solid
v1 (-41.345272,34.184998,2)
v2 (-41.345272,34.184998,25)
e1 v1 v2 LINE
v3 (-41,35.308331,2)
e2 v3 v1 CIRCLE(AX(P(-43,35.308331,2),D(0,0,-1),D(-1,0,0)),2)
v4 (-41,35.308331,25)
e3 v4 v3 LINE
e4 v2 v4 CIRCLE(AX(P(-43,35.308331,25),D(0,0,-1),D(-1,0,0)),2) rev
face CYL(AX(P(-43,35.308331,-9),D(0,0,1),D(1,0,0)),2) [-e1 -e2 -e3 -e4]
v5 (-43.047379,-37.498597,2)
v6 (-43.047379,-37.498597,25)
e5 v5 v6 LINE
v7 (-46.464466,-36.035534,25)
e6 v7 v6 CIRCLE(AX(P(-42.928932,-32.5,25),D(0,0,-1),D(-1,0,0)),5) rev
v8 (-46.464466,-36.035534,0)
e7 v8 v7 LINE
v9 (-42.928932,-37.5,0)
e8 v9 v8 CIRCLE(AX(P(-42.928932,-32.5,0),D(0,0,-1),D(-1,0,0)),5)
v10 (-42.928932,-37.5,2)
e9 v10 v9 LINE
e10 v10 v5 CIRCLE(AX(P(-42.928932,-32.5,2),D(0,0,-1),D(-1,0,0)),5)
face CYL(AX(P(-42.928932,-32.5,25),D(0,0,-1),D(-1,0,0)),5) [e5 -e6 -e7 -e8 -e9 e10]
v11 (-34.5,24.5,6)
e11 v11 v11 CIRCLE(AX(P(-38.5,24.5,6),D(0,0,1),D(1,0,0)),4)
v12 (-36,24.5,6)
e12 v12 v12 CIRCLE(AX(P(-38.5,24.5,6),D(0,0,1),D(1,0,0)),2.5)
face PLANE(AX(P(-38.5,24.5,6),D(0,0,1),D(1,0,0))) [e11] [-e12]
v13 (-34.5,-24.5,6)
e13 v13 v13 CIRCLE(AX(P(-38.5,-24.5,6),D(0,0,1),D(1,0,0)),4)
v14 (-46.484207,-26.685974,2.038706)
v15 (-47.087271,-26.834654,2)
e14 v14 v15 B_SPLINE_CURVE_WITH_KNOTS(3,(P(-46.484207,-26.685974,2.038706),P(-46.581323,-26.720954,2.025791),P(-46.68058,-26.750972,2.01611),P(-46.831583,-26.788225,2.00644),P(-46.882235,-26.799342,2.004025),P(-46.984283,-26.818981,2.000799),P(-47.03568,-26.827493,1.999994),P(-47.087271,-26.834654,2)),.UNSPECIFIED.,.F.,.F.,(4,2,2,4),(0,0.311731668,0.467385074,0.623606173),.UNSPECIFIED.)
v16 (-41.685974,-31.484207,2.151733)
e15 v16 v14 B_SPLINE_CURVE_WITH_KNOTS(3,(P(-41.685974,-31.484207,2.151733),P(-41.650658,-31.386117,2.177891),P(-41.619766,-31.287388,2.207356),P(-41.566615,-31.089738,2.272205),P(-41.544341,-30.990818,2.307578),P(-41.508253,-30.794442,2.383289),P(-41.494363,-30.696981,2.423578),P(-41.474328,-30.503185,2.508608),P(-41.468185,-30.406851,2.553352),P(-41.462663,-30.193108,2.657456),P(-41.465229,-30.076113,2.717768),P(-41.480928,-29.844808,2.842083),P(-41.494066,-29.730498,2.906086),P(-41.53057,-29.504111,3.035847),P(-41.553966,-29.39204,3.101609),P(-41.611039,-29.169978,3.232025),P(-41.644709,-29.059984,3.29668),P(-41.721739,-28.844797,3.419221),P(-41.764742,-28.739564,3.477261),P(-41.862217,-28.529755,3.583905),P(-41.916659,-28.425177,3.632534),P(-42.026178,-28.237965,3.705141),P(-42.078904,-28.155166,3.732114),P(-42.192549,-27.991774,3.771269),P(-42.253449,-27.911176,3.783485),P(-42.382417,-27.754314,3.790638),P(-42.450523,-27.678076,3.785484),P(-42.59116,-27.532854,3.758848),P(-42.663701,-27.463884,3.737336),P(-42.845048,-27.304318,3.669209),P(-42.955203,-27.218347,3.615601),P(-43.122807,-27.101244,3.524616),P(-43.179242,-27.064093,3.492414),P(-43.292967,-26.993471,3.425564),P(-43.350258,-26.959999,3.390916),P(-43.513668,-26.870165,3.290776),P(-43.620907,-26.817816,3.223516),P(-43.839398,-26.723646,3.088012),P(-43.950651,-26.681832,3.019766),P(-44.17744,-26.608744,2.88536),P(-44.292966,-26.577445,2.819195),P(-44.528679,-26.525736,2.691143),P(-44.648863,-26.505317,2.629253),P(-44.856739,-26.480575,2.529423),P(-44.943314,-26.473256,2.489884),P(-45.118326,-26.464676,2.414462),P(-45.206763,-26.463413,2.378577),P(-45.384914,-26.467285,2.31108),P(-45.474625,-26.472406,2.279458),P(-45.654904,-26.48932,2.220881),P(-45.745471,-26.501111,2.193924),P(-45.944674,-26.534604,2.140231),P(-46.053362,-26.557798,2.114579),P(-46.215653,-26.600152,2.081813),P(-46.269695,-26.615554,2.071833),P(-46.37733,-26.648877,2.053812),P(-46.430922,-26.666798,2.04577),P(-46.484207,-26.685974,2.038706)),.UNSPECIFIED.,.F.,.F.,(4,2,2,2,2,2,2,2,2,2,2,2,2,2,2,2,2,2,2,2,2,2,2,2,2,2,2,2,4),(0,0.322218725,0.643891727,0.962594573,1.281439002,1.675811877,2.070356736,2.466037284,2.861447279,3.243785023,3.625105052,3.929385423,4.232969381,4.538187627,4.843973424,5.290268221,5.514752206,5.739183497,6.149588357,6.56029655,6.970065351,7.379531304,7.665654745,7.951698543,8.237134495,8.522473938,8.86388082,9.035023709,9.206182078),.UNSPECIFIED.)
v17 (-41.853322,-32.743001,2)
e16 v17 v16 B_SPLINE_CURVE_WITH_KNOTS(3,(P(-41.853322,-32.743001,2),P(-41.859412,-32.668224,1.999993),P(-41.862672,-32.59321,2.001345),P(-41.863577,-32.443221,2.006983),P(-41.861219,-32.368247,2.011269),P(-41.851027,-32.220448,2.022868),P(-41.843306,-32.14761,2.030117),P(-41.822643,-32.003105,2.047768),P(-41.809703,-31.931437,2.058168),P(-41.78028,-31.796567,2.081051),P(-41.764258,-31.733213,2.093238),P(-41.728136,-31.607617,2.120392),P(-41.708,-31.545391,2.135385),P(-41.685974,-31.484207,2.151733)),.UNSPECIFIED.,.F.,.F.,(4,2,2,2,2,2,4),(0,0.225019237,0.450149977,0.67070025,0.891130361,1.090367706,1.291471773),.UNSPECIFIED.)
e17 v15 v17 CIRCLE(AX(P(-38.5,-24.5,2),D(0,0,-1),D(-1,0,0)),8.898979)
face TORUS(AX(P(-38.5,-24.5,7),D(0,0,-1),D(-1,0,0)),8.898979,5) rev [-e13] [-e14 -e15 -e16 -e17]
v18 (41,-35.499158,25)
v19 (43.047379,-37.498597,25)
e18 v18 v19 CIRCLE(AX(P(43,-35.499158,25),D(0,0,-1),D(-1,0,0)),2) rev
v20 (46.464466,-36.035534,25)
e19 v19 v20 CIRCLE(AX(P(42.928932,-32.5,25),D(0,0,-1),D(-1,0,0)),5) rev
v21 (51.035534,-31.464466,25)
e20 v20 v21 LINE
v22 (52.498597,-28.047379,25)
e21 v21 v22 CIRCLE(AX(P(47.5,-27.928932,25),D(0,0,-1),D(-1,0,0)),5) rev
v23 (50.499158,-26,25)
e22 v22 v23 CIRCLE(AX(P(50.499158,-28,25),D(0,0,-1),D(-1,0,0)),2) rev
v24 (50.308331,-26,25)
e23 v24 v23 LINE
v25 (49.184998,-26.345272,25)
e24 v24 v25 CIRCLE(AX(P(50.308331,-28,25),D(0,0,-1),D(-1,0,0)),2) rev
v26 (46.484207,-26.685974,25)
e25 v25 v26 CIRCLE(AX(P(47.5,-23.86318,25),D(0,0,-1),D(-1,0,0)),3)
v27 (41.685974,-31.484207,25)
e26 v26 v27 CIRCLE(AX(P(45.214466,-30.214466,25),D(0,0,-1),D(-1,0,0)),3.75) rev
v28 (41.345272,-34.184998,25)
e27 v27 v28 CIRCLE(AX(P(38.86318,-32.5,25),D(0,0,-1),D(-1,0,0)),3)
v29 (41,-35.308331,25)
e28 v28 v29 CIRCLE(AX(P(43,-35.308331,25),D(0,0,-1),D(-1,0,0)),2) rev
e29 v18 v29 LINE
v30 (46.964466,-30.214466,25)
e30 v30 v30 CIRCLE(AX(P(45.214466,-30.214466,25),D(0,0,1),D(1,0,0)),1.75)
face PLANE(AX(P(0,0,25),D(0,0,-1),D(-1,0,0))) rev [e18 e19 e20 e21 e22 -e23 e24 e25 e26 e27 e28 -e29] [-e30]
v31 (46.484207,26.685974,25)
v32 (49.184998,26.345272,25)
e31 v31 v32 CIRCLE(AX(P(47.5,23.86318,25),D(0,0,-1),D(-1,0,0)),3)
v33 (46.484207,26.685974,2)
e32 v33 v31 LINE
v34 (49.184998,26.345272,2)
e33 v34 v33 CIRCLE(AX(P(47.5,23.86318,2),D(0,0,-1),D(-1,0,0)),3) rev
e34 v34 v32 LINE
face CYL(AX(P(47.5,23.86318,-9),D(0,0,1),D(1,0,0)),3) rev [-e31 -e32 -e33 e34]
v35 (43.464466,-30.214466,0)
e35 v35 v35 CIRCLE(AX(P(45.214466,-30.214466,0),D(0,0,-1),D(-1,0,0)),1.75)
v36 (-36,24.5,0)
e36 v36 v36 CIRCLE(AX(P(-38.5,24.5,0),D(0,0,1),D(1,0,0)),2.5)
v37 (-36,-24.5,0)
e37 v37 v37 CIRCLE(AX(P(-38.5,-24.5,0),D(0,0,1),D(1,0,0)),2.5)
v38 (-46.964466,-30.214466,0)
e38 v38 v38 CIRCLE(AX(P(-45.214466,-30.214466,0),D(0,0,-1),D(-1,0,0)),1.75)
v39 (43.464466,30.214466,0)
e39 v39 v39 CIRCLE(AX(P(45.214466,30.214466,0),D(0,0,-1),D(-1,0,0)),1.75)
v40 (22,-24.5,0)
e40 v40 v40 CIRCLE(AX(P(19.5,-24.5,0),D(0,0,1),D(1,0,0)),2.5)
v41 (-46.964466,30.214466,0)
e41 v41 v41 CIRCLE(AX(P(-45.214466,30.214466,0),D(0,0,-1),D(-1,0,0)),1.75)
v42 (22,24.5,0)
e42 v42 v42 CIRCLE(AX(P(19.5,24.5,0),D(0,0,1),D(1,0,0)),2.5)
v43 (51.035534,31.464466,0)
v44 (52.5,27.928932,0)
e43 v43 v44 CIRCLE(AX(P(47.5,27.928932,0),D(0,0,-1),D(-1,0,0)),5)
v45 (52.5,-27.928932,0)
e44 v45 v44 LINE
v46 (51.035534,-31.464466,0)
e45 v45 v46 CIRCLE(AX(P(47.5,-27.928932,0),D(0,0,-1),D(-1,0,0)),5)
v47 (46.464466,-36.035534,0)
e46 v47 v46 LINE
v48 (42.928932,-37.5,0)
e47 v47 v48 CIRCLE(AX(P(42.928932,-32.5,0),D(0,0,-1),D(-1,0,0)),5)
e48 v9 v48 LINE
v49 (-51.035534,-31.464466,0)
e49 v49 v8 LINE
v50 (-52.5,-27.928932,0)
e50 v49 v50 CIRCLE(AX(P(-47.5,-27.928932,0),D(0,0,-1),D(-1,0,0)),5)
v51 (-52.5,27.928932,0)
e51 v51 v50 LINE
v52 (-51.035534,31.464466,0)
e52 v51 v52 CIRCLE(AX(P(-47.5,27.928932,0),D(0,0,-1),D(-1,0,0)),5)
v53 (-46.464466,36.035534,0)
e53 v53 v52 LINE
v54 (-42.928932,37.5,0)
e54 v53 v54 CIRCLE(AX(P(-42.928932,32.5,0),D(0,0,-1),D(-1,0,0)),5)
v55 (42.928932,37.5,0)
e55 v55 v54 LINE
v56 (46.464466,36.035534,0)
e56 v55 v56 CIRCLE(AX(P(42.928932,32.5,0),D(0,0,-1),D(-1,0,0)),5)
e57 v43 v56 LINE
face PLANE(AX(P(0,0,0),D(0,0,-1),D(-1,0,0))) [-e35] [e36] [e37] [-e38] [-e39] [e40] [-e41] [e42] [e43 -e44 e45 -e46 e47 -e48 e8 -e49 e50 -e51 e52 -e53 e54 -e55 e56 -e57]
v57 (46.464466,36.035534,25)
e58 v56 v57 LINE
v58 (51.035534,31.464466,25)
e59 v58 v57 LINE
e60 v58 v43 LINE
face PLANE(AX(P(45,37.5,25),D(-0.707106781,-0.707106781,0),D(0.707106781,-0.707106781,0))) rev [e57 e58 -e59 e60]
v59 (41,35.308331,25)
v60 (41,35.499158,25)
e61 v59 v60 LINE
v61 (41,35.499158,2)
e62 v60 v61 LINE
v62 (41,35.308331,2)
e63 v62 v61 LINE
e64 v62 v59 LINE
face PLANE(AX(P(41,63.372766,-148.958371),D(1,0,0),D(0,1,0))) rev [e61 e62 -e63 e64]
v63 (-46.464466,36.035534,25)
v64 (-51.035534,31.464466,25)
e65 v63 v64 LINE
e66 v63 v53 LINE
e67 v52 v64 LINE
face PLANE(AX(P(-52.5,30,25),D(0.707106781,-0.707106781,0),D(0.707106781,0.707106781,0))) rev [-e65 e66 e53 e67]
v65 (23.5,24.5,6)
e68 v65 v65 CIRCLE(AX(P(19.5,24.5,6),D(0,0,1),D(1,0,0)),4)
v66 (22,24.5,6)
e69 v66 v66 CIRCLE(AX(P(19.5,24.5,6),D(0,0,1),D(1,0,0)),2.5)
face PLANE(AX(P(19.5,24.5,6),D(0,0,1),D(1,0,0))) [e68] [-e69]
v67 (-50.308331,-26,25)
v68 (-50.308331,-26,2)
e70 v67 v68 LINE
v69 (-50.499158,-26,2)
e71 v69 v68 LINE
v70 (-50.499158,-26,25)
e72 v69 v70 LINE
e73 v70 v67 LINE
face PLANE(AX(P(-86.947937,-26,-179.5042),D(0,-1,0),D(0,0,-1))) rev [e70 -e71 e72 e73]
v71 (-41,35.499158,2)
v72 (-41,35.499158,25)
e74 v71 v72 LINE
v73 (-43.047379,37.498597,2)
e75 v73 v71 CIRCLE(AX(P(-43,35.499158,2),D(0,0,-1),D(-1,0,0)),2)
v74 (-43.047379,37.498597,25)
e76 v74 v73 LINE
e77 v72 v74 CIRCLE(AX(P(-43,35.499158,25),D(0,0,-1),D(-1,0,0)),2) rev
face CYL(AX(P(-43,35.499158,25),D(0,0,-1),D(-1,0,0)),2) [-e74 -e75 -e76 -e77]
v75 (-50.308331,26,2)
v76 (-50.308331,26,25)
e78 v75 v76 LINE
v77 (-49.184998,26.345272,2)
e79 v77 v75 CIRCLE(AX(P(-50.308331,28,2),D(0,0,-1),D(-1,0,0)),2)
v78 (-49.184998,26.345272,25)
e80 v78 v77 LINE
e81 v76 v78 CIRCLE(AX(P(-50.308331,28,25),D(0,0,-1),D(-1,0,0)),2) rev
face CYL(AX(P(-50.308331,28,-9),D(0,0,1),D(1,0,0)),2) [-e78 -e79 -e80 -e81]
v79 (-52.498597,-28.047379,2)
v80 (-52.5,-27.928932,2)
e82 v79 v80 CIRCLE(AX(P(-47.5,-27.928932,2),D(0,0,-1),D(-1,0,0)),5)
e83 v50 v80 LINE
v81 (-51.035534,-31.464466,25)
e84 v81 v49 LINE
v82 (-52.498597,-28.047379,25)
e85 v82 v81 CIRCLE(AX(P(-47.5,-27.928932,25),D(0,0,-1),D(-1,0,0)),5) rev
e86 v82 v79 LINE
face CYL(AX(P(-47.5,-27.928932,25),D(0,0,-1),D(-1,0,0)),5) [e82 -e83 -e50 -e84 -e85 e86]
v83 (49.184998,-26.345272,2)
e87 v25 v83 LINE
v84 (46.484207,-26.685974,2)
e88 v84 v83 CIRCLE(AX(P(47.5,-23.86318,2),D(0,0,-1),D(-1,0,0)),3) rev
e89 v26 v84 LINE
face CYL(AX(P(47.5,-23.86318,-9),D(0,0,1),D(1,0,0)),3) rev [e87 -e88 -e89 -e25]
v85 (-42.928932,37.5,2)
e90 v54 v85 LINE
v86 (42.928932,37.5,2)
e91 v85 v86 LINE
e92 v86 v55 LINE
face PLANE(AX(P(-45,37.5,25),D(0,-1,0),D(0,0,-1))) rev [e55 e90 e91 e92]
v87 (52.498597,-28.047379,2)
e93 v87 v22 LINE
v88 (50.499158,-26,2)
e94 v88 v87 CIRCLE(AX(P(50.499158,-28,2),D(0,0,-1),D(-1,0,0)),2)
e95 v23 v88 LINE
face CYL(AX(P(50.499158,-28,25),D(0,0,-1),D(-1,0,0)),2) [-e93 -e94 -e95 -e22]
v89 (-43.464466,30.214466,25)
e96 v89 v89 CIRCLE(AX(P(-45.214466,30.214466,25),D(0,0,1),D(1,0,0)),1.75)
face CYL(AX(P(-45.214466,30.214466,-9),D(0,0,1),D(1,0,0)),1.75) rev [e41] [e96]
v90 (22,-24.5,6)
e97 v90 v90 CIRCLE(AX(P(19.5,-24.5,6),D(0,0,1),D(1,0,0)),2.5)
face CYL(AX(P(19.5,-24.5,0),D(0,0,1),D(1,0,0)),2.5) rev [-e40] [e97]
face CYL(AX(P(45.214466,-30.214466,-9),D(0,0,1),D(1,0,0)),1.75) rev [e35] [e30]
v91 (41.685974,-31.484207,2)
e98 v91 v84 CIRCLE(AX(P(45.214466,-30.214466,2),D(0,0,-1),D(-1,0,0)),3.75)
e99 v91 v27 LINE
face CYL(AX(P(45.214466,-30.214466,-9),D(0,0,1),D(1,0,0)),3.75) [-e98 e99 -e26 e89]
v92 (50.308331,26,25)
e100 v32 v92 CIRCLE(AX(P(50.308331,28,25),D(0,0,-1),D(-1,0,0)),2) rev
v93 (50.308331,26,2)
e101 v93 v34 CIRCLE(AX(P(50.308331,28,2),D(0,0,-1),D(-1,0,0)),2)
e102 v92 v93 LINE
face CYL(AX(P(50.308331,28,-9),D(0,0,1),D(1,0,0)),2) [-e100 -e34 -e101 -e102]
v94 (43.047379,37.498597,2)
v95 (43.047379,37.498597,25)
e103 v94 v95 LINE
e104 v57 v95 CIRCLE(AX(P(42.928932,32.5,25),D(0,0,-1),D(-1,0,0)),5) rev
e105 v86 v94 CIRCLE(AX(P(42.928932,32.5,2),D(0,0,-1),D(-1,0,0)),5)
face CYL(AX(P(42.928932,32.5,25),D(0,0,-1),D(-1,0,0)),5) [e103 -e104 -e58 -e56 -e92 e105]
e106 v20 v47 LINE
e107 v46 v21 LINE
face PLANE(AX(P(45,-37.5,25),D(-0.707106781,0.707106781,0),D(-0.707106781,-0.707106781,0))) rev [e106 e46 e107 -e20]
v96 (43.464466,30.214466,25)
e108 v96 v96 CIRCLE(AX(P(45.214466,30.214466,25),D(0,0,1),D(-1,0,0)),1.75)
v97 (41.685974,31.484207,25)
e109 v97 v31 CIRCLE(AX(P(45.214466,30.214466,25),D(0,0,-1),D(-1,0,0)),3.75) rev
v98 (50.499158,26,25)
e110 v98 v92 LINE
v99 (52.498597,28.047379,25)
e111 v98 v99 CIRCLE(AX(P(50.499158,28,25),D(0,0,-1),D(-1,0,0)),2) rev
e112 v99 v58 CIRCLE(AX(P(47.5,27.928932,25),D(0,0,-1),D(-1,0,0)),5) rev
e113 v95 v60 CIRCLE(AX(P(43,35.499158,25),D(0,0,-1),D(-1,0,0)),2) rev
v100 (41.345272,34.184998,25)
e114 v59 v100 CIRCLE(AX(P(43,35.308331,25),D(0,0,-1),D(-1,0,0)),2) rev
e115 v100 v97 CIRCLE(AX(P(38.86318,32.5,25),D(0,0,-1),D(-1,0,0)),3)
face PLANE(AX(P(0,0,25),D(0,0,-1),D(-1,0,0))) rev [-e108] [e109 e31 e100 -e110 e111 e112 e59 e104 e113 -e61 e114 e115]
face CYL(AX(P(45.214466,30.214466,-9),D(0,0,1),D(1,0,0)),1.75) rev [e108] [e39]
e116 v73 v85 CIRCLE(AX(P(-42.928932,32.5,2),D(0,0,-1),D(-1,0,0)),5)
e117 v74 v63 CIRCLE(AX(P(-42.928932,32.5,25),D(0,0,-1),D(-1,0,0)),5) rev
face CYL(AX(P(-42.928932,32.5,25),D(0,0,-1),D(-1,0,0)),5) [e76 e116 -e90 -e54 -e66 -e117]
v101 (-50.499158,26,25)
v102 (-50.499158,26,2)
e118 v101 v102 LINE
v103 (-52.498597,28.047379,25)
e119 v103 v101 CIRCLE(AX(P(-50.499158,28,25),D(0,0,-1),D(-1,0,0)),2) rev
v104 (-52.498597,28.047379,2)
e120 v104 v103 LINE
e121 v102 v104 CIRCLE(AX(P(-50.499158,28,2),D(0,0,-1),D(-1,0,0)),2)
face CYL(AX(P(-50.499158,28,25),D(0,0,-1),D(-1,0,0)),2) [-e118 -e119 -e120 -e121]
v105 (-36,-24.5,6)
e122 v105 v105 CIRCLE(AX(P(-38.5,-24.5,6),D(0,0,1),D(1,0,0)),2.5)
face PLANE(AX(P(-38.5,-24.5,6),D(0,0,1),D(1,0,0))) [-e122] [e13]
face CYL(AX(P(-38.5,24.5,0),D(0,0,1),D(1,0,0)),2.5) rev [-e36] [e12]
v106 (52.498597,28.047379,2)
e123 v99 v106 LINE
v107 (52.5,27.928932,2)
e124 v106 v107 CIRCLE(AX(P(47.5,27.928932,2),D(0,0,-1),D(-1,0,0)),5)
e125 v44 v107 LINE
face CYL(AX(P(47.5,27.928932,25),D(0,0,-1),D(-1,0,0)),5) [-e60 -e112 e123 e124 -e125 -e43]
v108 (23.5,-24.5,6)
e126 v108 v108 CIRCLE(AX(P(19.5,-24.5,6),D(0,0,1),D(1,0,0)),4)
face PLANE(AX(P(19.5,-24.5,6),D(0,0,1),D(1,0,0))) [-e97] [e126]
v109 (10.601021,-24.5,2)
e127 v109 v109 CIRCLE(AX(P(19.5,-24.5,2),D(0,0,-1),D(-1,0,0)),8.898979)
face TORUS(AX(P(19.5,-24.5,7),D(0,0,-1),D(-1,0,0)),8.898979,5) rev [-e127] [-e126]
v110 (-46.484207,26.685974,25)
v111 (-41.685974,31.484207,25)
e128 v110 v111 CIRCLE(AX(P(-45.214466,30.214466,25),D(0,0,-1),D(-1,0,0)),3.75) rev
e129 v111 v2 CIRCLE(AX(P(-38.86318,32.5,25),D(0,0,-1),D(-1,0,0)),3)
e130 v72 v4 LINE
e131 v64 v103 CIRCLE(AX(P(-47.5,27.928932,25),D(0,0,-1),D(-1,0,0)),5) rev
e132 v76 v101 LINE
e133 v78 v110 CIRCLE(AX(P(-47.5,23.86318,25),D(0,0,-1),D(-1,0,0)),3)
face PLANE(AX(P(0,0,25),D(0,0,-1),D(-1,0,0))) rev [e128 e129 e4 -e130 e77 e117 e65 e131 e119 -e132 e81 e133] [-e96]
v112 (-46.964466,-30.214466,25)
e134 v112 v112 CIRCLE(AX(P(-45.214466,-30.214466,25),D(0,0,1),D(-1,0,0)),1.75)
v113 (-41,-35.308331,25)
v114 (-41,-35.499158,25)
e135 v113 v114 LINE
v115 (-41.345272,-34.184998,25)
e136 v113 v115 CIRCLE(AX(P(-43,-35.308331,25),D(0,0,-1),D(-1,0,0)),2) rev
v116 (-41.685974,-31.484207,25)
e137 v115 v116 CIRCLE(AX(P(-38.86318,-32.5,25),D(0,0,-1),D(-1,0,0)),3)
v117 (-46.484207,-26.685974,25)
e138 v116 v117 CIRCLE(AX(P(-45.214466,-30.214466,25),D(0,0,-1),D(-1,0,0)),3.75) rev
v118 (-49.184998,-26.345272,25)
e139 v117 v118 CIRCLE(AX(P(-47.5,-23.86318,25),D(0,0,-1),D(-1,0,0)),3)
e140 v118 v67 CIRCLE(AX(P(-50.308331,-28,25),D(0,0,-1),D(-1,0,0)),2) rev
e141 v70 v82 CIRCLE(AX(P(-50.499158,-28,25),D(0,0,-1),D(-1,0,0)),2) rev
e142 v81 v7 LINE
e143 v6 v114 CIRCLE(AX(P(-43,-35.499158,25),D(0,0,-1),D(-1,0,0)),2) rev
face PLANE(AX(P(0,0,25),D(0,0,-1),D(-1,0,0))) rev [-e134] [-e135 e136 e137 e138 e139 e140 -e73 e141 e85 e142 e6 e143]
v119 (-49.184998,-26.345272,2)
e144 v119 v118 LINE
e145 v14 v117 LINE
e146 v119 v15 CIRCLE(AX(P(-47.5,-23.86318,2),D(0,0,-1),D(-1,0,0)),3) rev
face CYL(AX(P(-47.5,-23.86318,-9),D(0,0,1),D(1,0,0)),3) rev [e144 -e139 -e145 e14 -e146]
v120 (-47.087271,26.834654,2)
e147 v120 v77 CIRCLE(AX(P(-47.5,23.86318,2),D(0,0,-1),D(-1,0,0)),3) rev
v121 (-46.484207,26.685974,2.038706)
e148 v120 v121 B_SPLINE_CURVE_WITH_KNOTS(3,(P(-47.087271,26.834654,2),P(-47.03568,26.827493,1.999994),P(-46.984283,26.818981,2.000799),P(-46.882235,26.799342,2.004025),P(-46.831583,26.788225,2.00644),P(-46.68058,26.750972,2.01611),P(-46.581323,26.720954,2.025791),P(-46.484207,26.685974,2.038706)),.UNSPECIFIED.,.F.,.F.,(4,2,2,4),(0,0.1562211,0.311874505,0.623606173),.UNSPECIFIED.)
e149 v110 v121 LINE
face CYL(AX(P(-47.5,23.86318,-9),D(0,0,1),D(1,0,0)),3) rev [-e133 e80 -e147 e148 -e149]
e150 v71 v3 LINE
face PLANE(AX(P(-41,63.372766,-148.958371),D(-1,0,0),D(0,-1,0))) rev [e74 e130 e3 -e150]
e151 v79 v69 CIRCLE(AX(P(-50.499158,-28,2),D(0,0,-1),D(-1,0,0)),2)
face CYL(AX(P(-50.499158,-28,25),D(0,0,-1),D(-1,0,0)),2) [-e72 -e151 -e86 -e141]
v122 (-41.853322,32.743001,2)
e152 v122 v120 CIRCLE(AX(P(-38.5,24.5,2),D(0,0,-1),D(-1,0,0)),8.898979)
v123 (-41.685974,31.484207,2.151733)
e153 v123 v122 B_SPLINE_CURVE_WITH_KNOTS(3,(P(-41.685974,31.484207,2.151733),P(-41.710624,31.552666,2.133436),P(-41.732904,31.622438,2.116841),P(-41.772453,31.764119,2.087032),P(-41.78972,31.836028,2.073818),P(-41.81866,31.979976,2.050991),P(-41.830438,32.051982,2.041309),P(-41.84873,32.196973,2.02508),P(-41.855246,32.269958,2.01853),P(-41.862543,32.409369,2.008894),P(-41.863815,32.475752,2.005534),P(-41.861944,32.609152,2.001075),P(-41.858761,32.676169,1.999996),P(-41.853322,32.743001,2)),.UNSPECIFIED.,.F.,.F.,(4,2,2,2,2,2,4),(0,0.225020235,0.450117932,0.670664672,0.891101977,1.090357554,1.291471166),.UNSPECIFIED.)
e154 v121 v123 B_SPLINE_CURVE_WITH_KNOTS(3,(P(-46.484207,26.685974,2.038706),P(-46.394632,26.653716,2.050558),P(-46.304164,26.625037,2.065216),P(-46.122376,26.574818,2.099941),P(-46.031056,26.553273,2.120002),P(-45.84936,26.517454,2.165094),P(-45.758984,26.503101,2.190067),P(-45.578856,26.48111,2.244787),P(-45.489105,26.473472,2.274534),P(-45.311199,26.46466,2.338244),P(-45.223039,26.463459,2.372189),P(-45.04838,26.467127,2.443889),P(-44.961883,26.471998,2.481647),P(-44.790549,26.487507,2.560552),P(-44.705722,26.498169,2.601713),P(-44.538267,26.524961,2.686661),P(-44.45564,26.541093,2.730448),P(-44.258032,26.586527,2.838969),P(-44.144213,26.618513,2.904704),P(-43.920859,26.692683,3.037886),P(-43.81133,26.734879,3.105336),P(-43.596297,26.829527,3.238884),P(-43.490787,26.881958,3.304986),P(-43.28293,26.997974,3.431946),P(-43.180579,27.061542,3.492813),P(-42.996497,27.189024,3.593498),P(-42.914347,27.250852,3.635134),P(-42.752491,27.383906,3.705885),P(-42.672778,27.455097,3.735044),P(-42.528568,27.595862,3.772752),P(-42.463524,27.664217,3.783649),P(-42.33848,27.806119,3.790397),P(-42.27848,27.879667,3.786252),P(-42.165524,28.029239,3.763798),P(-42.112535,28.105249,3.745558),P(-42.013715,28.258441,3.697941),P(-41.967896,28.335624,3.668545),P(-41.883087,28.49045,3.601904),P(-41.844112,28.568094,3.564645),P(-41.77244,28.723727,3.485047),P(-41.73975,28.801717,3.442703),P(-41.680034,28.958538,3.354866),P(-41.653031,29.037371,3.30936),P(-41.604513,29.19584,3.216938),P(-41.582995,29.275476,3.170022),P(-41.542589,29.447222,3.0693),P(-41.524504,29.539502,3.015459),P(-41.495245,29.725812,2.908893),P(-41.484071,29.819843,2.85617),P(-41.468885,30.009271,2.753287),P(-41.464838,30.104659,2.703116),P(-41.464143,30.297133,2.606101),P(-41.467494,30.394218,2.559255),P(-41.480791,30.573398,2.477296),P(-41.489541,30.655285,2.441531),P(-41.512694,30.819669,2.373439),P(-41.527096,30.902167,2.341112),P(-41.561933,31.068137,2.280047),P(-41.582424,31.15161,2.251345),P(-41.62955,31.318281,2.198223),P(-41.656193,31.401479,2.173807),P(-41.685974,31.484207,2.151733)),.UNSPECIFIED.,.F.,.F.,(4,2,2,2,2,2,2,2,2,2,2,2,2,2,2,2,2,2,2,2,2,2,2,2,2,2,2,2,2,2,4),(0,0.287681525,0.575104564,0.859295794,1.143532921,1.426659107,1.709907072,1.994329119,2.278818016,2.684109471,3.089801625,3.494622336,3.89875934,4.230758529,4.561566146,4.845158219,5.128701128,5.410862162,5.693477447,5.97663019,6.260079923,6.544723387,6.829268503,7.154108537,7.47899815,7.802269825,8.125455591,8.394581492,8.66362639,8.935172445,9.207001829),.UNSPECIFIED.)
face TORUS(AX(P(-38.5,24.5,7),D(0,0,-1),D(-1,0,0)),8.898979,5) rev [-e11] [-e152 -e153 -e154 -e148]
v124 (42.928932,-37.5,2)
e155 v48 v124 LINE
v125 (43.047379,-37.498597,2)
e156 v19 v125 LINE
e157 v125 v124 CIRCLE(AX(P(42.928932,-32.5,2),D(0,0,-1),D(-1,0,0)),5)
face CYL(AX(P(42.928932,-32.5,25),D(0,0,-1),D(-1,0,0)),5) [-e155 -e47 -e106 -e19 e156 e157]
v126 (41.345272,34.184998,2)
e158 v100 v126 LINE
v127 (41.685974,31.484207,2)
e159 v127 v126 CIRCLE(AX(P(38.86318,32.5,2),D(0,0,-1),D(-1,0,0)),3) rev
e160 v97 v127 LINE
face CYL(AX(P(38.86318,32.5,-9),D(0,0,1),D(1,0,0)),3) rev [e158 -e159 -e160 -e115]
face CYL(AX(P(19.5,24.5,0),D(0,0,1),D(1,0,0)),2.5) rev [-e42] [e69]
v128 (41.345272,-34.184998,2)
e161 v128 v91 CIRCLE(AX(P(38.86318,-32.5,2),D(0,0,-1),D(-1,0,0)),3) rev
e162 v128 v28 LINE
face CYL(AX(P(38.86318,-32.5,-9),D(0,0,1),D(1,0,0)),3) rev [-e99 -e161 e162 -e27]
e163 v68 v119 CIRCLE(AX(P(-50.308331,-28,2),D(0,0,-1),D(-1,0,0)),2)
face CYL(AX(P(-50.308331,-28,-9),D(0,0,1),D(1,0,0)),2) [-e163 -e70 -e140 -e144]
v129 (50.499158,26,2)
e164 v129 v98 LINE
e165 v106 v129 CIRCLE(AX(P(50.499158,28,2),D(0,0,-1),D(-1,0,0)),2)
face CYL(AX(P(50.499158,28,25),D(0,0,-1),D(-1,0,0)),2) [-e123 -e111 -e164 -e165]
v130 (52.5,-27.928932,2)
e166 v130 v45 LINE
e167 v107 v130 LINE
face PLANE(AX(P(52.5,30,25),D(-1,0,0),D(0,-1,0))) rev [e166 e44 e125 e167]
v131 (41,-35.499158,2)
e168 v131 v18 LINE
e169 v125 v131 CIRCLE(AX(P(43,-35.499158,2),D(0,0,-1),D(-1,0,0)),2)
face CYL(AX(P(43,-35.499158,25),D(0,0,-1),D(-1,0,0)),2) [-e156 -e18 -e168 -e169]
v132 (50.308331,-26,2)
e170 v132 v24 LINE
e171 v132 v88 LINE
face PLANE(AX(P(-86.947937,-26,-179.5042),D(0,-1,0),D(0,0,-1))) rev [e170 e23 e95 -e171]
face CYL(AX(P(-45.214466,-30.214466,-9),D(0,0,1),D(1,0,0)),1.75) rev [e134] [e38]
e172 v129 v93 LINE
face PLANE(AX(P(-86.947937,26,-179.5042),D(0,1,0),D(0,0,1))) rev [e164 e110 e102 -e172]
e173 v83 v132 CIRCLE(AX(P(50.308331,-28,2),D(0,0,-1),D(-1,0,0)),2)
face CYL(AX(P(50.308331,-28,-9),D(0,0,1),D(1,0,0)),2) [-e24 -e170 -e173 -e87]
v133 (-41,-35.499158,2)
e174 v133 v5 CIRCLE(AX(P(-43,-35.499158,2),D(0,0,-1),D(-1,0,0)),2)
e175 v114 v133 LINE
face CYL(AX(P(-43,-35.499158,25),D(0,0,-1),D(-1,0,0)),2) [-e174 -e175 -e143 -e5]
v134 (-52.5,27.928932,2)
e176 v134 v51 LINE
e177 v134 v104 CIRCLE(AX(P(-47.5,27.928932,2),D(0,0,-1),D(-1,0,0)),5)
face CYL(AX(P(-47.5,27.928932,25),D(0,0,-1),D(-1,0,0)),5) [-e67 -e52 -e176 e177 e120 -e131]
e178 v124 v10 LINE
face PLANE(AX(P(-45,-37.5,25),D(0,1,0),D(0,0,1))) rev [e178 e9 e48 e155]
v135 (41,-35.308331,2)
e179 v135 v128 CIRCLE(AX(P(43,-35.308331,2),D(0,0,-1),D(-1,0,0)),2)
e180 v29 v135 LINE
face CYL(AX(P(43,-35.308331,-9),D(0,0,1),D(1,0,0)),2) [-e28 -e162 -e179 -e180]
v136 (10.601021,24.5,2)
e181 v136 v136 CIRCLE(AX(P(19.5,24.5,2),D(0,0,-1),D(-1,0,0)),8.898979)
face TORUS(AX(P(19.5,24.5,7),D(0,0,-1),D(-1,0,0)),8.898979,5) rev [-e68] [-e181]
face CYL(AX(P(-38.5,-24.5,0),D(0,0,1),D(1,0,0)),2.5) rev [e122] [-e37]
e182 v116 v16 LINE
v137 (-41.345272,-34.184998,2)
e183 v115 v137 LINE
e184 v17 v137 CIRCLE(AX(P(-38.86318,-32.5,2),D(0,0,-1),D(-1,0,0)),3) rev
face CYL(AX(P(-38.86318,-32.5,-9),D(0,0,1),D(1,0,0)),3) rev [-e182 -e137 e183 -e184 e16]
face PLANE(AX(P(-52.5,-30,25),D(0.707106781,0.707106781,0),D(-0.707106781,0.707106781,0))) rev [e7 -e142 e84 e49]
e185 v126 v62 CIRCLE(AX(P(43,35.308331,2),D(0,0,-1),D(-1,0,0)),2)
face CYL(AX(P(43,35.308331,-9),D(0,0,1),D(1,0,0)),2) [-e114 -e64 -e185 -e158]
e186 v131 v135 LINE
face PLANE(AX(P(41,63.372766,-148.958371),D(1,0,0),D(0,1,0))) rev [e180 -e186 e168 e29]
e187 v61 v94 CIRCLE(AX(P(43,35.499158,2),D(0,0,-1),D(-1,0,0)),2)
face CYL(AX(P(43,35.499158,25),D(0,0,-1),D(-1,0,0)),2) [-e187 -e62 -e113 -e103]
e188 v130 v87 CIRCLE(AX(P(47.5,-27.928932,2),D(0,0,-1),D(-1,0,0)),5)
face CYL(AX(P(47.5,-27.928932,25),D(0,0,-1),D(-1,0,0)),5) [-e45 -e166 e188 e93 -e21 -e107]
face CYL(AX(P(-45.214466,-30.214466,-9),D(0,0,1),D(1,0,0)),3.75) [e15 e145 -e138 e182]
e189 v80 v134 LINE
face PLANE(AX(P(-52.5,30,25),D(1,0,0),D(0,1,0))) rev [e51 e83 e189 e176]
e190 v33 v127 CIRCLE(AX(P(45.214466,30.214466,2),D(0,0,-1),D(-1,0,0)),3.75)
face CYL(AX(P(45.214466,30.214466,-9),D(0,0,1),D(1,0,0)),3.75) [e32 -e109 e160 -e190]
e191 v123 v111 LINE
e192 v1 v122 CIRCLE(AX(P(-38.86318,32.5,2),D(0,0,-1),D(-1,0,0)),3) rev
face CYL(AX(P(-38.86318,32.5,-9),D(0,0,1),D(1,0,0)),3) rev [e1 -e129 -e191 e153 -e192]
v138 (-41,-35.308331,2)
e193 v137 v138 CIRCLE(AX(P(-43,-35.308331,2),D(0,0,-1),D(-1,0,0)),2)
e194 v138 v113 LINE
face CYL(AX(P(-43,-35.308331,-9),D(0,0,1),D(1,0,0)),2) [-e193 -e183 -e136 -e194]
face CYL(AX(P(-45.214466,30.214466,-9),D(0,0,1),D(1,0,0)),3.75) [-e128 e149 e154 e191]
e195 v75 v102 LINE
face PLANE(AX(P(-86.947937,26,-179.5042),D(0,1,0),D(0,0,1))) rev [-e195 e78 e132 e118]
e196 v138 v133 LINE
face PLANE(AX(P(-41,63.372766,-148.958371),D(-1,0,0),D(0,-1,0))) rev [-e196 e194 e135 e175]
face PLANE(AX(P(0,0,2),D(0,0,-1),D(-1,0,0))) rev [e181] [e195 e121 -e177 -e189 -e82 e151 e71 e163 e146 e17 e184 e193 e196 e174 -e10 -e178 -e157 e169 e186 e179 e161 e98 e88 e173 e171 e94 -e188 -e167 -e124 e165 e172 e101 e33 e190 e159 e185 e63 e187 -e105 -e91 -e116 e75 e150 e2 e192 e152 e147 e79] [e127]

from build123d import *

# Parameters (mm, degrees)
EXTRUDE_1_DEPTH     = 25
SKETCH_2_R          = 1.75
CUT_EXTRUDE_1_DEPTH = 34
SHELL_1_T           = -2
FILLET_1_R          = 10
FILLET_2_R          = 3
FILLET_3_R          = 5
SKETCH_4_W          = 82
SKETCH_4_H          = 126.745531776
CUT_EXTRUDE_2_DEPTH = 23
FILLET_4_R          = 2
SKETCH_5_W          = 173.89587329
SKETCH_5_H          = 52
CUT_EXTRUDE_3_DEPTH = 23
FILLET_5_R          = 2
SKETCH_6_R          = 4
EXTRUDE_2_DEPTH     = 4
SKETCH_7_R          = 2.5
CUT_EXTRUDE_4_DEPTH = 6
FILLET_6_R          = 5


with BuildPart() as part:
    # Эскиз1 → Бобышка-Вытянуть1 (new body)
    with BuildSketch(Plane.XY):
        Polygon((-52.5, 30), (-45, 37.5), (45, 37.5), (52.5, 30), (52.5, -30), (45, -37.5), (-45, -37.5), (-52.5, -30), align=None)
    extrude(amount=EXTRUDE_1_DEPTH)

    # Эскиз2 → Вырез-Вытянуть1 (cut)
    with BuildSketch(Plane.XY.offset(25)):
        with Locations((-45.214466094, 30.214466094)):
            Circle(SKETCH_2_R)
        with Locations(Location((45.214466094, 30.214466094, 0), (0, 0, 180))):
            Circle(SKETCH_2_R)
        with Locations((45.214466094, -30.214466094)):
            Circle(SKETCH_2_R)
        with Locations(Location((-45.214466094, -30.214466094, 0), (0, 0, 180))):
            Circle(SKETCH_2_R)
    extrude(amount=-CUT_EXTRUDE_1_DEPTH, mode=Mode.SUBTRACT)

    # Оболочка1
    shell_1_openings = [part.faces().sort_by_distance(p)[0] for p in [
        (0, 0, 25),
    ]]
    offset(amount=SHELL_1_T, openings=shell_1_openings, kind=Kind.INTERSECTION)

    # Скругление1
    # the kernel refuses this fillet: 10 mm, written as the material it adds along each edge
    with BuildSketch(Plane(origin=(-45.74479618, -33.926776695, 2), x_dir=(0.7071067811865442, -0.7071067811865507, 0), z_dir=(0, 0, 1)), Plane(origin=(48.926776695, -30.74479618, 2), x_dir=(0.7071067811865482, 0.7071067811865467, 0), z_dir=(0, 0, 1)), Plane(origin=(45.74479618, 33.926776695, 2), x_dir=(-0.707106781186546, 0.7071067811865492, 0), z_dir=(0, 0, 1)), Plane(origin=(-48.926776695, 30.74479618, 2), x_dir=(-0.7071067811865508, -0.7071067811865444, 0), z_dir=(0, 0, 1))) as fillet_1_piece_1:
        with BuildLine():
            CenterArc((11.477032042, 3.794412555), FILLET_1_R, 183.312134334, 18.986942704)
            Line((1.493736012, 3.21665797), (1.294070091, 3.205102878))
            ThreePointArc((1.294070091, 3.205102878), (0.969771845, 1.504817982), (-0.12, 0.16))
            Line((-0.12, 0.16), (0, -0.2))
            ThreePointArc((0, -0.2), (1.112436867, -0.2), (2.039830568, -0.075888251))
            Line((2.039830568, -0.075888251), (2.224873734, 0))
        make_face()
    extrude(amount=23)
    with BuildSketch(Plane(origin=(-48.926776695, -30.74479618, 2), x_dir=(0.34351243985929386, 0.9391481265816991, 0), z_dir=(0, 0, 1)), Plane(origin=(45.74479618, -33.926776695, 2), x_dir=(-0.9391481265817004, 0.34351243985929, 0), z_dir=(0, 0, 1)), Plane(origin=(48.926776695, 30.74479618, 2), x_dir=(-0.3435124398592874, -0.9391481265817014, 0), z_dir=(0, 0, 1)), Plane(origin=(-45.74479618, 33.926776695, 2), x_dir=(0.9391481265817011, -0.34351243985928803, 0), z_dir=(0, 0, 1))) as fillet_1_piece_2:
        with BuildLine():
            CenterArc((8.275322434, 8.811292173), FILLET_1_R, 222.791938952, 18.986942704)
            Line((0.937067943, 2.017911495), (0.790302854, 1.882043882))
            ThreePointArc((0.790302854, 1.882043882), (0.287138375, 1.093191354), (-0.181395597, 0.084235607))
            Line((-0.181395597, 0.084235607), (0.094575114, -0.176225843))
            ThreePointArc((0.094575114, -0.176225843), (1.773283379, 0.245765435), (3.451991644, -0.176225843))
            Line((3.451991644, -0.176225843), (3.546566758, 0))
        make_face()
    extrude(amount=23)

    # Скругление2
    fillet_2_edges = [part.edges().sort_by_distance(p)[0] for p in [
        (-50.5, 29.171572875, 13.5),
        (-44.171572875, 35.5, 13.5),
        (-44.171572875, -35.5, 13.5),
        (-50.5, -29.171572875, 13.5),
        (44.171572875, -35.5, 13.5),
        (50.5, -29.171572875, 13.5),
        (50.5, 29.171572875, 13.5),
        (44.171572875, 35.5, 13.5),
    ]]
    fillet(fillet_2_edges, radius=FILLET_2_R)

    # Скругление3
    fillet_3_edges = [part.edges().sort_by_distance(p)[0] for p in [
        (45, 37.5, 12.5),
        (52.5, 30, 12.5),
        (52.5, -30, 12.5),
        (45, -37.5, 12.5),
        (-45, -37.5, 12.5),
        (-52.5, -30, 12.5),
        (-52.5, 30, 12.5),
        (-45, 37.5, 12.5),
    ]]
    fillet(fillet_3_edges, radius=FILLET_3_R)

    # Эскиз4 → Вырез-Вытянуть2 (cut)
    with BuildSketch(Plane.XY.offset(25)):
        Rectangle(SKETCH_4_W, SKETCH_4_H)
    extrude(amount=-CUT_EXTRUDE_2_DEPTH, mode=Mode.SUBTRACT)

    # Скругление4
    # the kernel refuses this fillet: 2 mm, written as the material it takes off along each edge
    with BuildSketch(Plane(origin=(41, -34.605706623, 2), x_dir=(0, -1, 0), z_dir=(0, 0, 1)), Plane(origin=(41, 34.605706623, 26.756559814), x_dir=(0, 1, 0), z_dir=(0, 0, -1))) as fillet_4_piece_1:
        with BuildLine():
            CenterArc((0.702623926, 2), FILLET_4_R, 235.828901177, 34.171098823)
            ThreePointArc((-0.420708294, 0.345272009), (-0.20250821, 0.18219615), (0, 0))
            Line((0, 0), (0.702623926, 0))
        make_face()
    extrude(amount=24.756559814, mode=Mode.SUBTRACT)
    with BuildSketch(Plane(origin=(41, -37.5, 30.118447555), x_dir=(0.9999997651545144, 0.0006853400003404547, 0), z_dir=(0, 0, -1)), Plane(origin=(-41, -37.5, 2), x_dir=(-0.9999997651545144, 0.0006853400003439418, 0), z_dir=(0, 0, 1)), Plane(origin=(41, 37.5, 2), x_dir=(0.9999997651545144, -0.0006853400003439394, 0), z_dir=(0, 0, 1))) as fillet_4_piece_2:
        with BuildLine():
            CenterArc((2.001370787, -1.999470741), FILLET_4_R, 88.681844886, 91.357422207)
            Line((0.001371257, -2.000841421), (-0.198628696, -2.000978489))
            Line((-0.198628696, -2.000978489), (-0.199999953, -0.000137068))
            Line((-0.199999953, -0.000137068), (-0.000137068, 0.199999953))
            ThreePointArc((-0.000137068, 0.199999953), (1.928794667, 0.201321927), (2.051979846, 0.199947074))
            Line((2.051979846, 0.199947074), (2.047379022, 0))
        make_face()
    extrude(amount=28.118447555, mode=Mode.SUBTRACT)
    with BuildSketch(Plane(origin=(-41, -34.605706623, 2), x_dir=(0, -1, 0), z_dir=(0, 0, 1))) as fillet_4_piece_3:
        with BuildLine():
            CenterArc((0.702623926, -2), FILLET_4_R, 90, 34.171098823)
            ThreePointArc((-0.420708294, -0.345272009), (-0.20250821, -0.18219615), (0, 0))
            Line((0, 0), (0.702623926, 0))
        make_face()
    extrude(amount=24.756559814, mode=Mode.SUBTRACT)
    with BuildSketch(Plane(origin=(-41, 34.605706623, 26.756559814), x_dir=(-0.6343994710235763, -0.7730053758965758, 0), z_dir=(0, 0, -1))) as fillet_4_piece_4:
        with BuildLine():
            CenterArc((0.72566687, 1.991754999), FILLET_4_R, 230.624541426, 34.171098823)
            Line((-0.543132072, 0.445744247), (0, 0))
            ThreePointArc((0, 0), (0.272125076, 0.012367502), (0.544250153, 0))
        make_face()
    extrude(amount=24.756559814, mode=Mode.SUBTRACT)
    with BuildSketch(Plane(origin=(-41, 37.5, 30.118447555), x_dir=(0, -1, 0), z_dir=(0, 0, -1))) as fillet_4_piece_5:
        with BuildLine():
            CenterArc((2.00084189, 2), FILLET_4_R, 178.642577793, 91.357422207)
            Line((0.001403151, 2.047378541), (-0.198540723, 2.052116395))
            ThreePointArc((-0.198540723, 2.052116395), (-0.2, 1.928932188), (-0.2, 0))
            Line((-0.2, 0), (0, -0.2))
            Line((0, -0.2), (2.00084189, -0.2))
            Line((2.00084189, -0.2), (2.00084189, 0))
        make_face()
    extrude(amount=28.118447555, mode=Mode.SUBTRACT)

    # Эскиз5 → Вырез-Вытянуть3 (cut)
    with BuildSketch(Plane.XY.offset(25)):
        Rectangle(SKETCH_5_W, SKETCH_5_H)
    extrude(amount=-CUT_EXTRUDE_3_DEPTH, mode=Mode.SUBTRACT)

    # Скругление5
    # the kernel refuses this fillet: 2 mm, written as the material it takes off along each edge
    with BuildSketch(Plane(origin=(49.605706623, -26, 26.756559814), x_dir=(1, 0, 0), z_dir=(0, 0, -1)), Plane(origin=(-49.605706623, -26, 2), x_dir=(-1, 0, 0), z_dir=(0, 0, 1))) as fillet_5_piece_1:
        with BuildLine():
            CenterArc((0.702623926, 2), FILLET_5_R, 235.828901177, 34.171098823)
            ThreePointArc((-0.420708294, 0.345272009), (-0.20250821, 0.18219615), (0, 0))
            Line((0, 0), (0.702623926, 0))
        make_face()
    extrude(amount=24.756559814, mode=Mode.SUBTRACT)
    with BuildSketch(Plane(origin=(52.5, -26, 2), x_dir=(-0.0006853400003439216, -0.9999997651545144, 0), z_dir=(0, 0, 1)), Plane(origin=(52.5, 26, 30.118447555), x_dir=(-0.0006853400003439287, 0.9999997651545144, 0), z_dir=(0, 0, -1)), Plane(origin=(-52.5, -26, 30.118447555), x_dir=(0.0006853400003404618, -0.9999997651545144, 0), z_dir=(0, 0, -1)), Plane(origin=(-52.5, 26, 2), x_dir=(0.0006853400003404558, 0.9999997651545144, 0), z_dir=(0, 0, 1))) as fillet_5_piece_2:
        with BuildLine():
            CenterArc((2.001370787, -1.999470741), FILLET_5_R, 88.681844886, 91.357422207)
            Line((0.001371257, -2.000841421), (-0.198628696, -2.000978489))
            Line((-0.198628696, -2.000978489), (-0.199999953, -0.000137068))
            Line((-0.199999953, -0.000137068), (-0.000137068, 0.199999953))
            ThreePointArc((-0.000137068, 0.199999953), (1.928794667, 0.201321927), (2.051979846, 0.199947074))
            Line((2.051979846, 0.199947074), (2.047379022, 0))
        make_face()
    extrude(amount=28.118447555, mode=Mode.SUBTRACT)
    with BuildSketch(Plane(origin=(49.605706623, 26, 26.756559814), x_dir=(-0.7730053758965695, 0.6343994710235842, 0), z_dir=(0, 0, -1))) as fillet_5_piece_3:
        with BuildLine():
            CenterArc((0.72566687, 1.991754999), FILLET_5_R, 230.624541426, 34.171098823)
            Line((-0.543132072, 0.445744247), (0, 0))
            ThreePointArc((0, 0), (0.272125076, 0.012367502), (0.544250153, 0))
        make_face()
    extrude(amount=24.756559814, mode=Mode.SUBTRACT)
    with BuildSketch(Plane(origin=(-49.605706623, 26, 2), x_dir=(-1, 0, 0), z_dir=(0, 0, 1))) as fillet_5_piece_4:
        with BuildLine():
            CenterArc((0.702623926, -2), FILLET_5_R, 90, 34.171098823)
            ThreePointArc((-0.420708294, -0.345272009), (-0.20250821, -0.18219615), (0, 0))
            Line((0, 0), (0.702623926, 0))
        make_face()
    extrude(amount=24.756559814, mode=Mode.SUBTRACT)

    # Эскиз6 → Бобышка-Вытянуть2 (add)
    with BuildSketch(Plane.XY.offset(2)):
        with Locations(Location((-38.5, 24.5, 0), (0, 0, 180))):
            Circle(SKETCH_6_R)
        with Locations(Location((19.5, 24.5, 0), (0, 0, 180))):
            Circle(SKETCH_6_R)
        with Locations(Location((19.5, -24.5, 0), (0, 0, 180))):
            Circle(SKETCH_6_R)
        with Locations(Location((-38.5, -24.5, 0), (0, 0, 180))):
            Circle(SKETCH_6_R)
    extrude(amount=EXTRUDE_2_DEPTH)

    # Эскиз7 → Вырез-Вытянуть4 (cut)
    with BuildSketch(Plane.XY.offset(6)):
        with Locations((-38.5, 24.5)):
            Circle(SKETCH_7_R)
        with Locations((19.5, 24.5)):
            Circle(SKETCH_7_R)
        with Locations((19.5, -24.5)):
            Circle(SKETCH_7_R)
        with Locations((-38.5, -24.5)):
            Circle(SKETCH_7_R)
    extrude(amount=-CUT_EXTRUDE_4_DEPTH, mode=Mode.SUBTRACT)

    # Скругление6
    # the kernel refuses this fillet: 5 mm, written as the material it adds along each edge
    with BuildSketch(Plane(origin=(-38.5, 24.5, 2), x_dir=(-1, 0, 0), z_dir=(0, 1, 0))) as fillet_6_piece_1_section:
        with BuildLine():
            CenterArc((8.898979486, 5), FILLET_6_R, 191.536959033, 78.463040967)
            Line((4, 4), (4, 0))
            Line((4, 0), (8.898979486, 0))
        make_face()
    fillet_6_piece_1 = revolve(axis=Axis((-38.5, 24.5, 2), (0, 0, 1)), mode=Mode.PRIVATE)
    fillet_6_piece_1 = fillet_6_piece_1 - Plane(origin=(-45.214466094, 30.214466094, 3.119270687), x_dir=(1, 0, 0), z_dir=(0, 0, 1)) * Cylinder(1.75, 36, mode=Mode.PRIVATE)
    add(fillet_6_piece_1)
    with BuildSketch(Plane(origin=(-38.5, -24.5, 2), x_dir=(-1, 0, 0), z_dir=(0, 1, 0))) as fillet_6_piece_2_section:
        with BuildLine():
            CenterArc((8.898979486, 5), FILLET_6_R, 191.536959033, 78.463040967)
            Line((4, 4), (4, 0))
            Line((4, 0), (8.898979486, 0))
        make_face()
    fillet_6_piece_2 = revolve(axis=Axis((-38.5, -24.5, 2), (0, 0, 1)), mode=Mode.PRIVATE)
    fillet_6_piece_2 = fillet_6_piece_2 - Plane(origin=(-45.214466094, -30.214466094, 3.119270687), x_dir=(-1, 0, 0), z_dir=(0, 0, 1)) * Cylinder(1.75, 36, mode=Mode.PRIVATE)
    add(fillet_6_piece_2)
    with BuildSketch(Plane(origin=(19.5, -24.5, 2), x_dir=(-1, 0, 0), z_dir=(0, 1, 0))) as fillet_6_piece_3:
        with BuildLine():
            CenterArc((8.898979486, 5), FILLET_6_R, 191.536959033, 78.463040967)
            Line((4, 4), (4, 0))
            Line((4, 0), (8.898979486, 0))
        make_face()
    revolve(axis=Axis((19.5, -24.5, 2), (0, 0, 1)))
    with BuildSketch(Plane(origin=(19.5, 24.5, 2), x_dir=(-1, 0, 0), z_dir=(0, 1, 0))) as fillet_6_piece_4:
        with BuildLine():
            CenterArc((8.898979486, 5), FILLET_6_R, 191.536959033, 78.463040967)
            Line((4, 4), (4, 0))
            Line((4, 0), (8.898979486, 0))
        make_face()
    revolve(axis=Axis((19.5, 24.5, 2), (0, 0, 1)))


solid = part.part
